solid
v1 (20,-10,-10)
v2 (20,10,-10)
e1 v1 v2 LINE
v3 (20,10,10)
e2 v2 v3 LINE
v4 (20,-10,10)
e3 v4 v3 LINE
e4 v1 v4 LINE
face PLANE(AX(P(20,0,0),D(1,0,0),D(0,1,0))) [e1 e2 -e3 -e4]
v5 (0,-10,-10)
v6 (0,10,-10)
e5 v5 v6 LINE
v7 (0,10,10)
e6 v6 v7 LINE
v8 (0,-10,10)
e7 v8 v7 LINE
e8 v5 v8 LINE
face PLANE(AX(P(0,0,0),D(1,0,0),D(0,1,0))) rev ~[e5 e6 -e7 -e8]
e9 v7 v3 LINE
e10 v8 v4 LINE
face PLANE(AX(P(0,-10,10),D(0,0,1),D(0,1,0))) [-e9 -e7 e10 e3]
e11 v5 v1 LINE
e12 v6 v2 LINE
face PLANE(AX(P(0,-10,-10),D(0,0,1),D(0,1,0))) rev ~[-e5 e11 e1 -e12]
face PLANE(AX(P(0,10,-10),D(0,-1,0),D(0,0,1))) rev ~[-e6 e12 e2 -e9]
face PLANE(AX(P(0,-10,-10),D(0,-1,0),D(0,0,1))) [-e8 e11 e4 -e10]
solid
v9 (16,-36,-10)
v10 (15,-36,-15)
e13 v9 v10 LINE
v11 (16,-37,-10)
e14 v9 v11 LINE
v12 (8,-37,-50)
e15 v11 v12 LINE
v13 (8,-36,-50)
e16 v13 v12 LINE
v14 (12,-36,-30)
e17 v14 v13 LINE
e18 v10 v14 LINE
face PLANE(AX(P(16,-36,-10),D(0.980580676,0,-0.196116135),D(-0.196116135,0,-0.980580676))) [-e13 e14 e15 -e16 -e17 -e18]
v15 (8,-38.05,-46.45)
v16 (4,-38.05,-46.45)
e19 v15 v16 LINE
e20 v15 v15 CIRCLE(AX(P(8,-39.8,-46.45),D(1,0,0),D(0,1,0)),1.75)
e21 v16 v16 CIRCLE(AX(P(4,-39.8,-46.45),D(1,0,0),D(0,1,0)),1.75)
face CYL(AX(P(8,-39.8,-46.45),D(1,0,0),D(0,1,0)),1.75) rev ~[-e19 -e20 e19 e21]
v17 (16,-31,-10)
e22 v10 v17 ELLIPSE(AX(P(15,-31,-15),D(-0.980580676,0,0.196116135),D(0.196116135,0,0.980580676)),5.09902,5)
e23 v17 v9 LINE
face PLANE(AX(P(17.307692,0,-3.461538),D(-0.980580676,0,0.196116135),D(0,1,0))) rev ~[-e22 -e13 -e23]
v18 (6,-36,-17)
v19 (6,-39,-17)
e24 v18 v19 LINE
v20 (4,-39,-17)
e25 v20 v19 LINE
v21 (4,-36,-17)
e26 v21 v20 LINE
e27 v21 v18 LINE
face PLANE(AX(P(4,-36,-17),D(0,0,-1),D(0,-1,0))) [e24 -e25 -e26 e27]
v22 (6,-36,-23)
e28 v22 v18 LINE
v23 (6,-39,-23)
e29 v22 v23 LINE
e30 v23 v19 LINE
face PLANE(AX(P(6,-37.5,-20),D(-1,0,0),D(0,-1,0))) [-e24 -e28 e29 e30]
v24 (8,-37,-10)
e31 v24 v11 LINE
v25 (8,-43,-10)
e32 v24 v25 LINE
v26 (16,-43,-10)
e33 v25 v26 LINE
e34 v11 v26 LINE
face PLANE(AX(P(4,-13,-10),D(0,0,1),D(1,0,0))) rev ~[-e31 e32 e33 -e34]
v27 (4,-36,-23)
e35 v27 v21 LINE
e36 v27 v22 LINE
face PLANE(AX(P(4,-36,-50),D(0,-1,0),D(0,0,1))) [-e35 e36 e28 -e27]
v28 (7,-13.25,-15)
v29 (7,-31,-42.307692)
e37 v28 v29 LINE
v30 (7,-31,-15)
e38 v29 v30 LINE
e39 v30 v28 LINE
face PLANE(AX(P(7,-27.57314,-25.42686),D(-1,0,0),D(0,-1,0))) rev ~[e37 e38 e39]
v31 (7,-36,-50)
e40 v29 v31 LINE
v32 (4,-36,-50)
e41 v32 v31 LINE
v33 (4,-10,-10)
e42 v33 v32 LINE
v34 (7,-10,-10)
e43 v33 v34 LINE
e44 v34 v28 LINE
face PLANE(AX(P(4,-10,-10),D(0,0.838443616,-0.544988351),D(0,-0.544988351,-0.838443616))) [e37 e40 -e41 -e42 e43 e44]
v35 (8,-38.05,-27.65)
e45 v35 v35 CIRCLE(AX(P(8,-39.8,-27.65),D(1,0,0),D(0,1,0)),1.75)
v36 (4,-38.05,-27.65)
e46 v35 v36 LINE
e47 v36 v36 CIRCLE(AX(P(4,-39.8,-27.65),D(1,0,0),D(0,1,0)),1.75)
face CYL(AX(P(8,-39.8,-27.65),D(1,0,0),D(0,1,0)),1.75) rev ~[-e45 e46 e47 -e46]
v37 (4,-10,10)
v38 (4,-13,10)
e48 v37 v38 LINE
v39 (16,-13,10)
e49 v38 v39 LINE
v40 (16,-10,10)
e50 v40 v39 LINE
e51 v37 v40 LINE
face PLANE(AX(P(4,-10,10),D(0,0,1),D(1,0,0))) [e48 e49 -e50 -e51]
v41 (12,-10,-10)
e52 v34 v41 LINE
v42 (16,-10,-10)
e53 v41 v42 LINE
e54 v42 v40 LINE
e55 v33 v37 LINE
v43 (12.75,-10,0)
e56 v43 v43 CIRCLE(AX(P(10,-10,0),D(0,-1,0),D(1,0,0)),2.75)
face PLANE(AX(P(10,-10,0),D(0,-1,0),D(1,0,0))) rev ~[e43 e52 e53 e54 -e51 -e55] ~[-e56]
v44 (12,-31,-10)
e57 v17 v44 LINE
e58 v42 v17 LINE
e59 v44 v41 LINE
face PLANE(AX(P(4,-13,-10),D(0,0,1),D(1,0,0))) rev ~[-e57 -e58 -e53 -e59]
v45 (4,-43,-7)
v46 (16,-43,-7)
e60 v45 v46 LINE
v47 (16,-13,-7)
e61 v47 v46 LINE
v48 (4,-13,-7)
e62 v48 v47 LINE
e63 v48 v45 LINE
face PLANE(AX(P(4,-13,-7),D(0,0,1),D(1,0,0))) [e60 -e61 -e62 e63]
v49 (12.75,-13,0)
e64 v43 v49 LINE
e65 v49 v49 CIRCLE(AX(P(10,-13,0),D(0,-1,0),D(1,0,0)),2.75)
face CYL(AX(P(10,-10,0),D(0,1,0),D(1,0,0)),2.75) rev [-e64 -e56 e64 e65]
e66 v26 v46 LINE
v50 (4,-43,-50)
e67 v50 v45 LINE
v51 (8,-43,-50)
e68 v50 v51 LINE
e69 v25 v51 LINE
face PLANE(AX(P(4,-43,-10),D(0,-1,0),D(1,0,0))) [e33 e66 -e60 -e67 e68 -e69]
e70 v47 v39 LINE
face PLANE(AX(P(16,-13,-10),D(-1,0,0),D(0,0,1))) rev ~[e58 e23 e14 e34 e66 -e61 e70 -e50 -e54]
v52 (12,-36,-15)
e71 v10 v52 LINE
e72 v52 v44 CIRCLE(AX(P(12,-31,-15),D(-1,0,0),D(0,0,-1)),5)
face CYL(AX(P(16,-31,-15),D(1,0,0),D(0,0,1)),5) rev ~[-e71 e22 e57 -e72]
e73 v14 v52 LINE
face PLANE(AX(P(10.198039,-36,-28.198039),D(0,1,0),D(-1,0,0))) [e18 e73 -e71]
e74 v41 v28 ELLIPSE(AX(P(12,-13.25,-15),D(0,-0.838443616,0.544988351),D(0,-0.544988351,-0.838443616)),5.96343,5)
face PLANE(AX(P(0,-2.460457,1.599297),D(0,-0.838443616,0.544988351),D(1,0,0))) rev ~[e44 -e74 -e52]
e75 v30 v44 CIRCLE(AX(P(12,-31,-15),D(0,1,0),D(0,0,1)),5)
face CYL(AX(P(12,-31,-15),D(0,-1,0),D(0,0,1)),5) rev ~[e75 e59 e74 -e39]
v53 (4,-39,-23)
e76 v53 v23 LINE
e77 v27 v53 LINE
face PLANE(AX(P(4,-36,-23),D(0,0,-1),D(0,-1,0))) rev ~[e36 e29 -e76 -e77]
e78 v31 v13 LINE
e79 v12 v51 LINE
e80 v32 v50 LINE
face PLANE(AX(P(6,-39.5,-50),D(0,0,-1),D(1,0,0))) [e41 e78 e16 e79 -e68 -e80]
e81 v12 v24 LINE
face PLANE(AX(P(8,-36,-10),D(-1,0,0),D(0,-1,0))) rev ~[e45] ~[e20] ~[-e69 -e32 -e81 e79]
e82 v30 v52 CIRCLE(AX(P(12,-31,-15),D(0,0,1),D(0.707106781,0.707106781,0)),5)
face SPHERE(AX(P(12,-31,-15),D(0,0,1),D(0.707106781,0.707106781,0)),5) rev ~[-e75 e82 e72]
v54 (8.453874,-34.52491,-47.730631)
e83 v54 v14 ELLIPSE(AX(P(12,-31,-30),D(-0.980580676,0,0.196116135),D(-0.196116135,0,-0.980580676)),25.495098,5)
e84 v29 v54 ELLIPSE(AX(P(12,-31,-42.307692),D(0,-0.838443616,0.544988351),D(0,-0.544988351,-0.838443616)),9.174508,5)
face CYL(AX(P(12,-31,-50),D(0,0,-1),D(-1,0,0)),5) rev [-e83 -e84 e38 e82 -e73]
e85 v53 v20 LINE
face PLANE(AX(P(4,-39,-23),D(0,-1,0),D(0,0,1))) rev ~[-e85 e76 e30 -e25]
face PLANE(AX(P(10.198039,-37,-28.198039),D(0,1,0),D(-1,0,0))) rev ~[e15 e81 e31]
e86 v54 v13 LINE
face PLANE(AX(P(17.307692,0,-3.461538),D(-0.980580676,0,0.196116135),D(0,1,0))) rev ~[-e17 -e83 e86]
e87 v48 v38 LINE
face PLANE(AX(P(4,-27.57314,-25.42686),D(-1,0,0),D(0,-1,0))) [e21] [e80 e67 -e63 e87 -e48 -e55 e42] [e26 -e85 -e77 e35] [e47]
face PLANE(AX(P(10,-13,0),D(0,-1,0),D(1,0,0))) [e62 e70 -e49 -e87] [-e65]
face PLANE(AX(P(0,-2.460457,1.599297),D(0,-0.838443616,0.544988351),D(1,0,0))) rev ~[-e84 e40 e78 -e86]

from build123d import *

# Parameters (mm, degrees)
F0_W          = 20
F0_H          = 20
F1_DEPTH      = 20
F2_W          = 12
F2_H          = 20
F2_R          = 2.75
F3_DEPTH      = 3
F4_W          = 12
F4_H          = 3
F5_DEPTH      = 30
F6_W          = 4
F6_H          = 7
F7_DEPTH      = 40
F8_R          = 1.75
F9_DEPTH      = 25
F11_DEPTH     = 1
F12_W         = 3
F12_H         = 6
F13_DEPTH     = 2
F15_DEPTH     = 3
F16_S3_W      = 5
F16_S3_H      = 5
F16_T4_DEPTH  = 5
F16_T10_DEPTH = 21
F16_T15_DEPTH = 4
F16_T20_DEPTH = 35


# Not quite as in the source:
# - a fillet or chamfer that OpenCascade refuses, or shapes differently, is made with other operations: its cross-section is extruded or revolved along the edge and cut away or added


with BuildPart() as f1:
    # F0 (on Right) → F1 (new body)
    with BuildSketch(Plane.YZ):
        Rectangle(F0_W, F0_H)
    extrude(amount=F1_DEPTH)


with BuildPart() as f3:
    # F2 (on face) → F3 (new body)
    with BuildSketch(Plane.XZ.offset(10)):
        with Locations((10, 0)):
            Rectangle(F2_W, F2_H)
        with Locations((10, 0)):
            Circle(F2_R, mode=Mode.SUBTRACT)
    extrude(amount=F3_DEPTH)

    # F4 (on face) → F5 (join)
    with BuildSketch(Plane.XZ.offset(13)):
        with Locations((10, -8.5)):
            Rectangle(F4_W, F4_H)
    extrude(amount=F5_DEPTH)

    # F6 (on face) → F7 (join)
    with BuildSketch(Plane(origin=(0, 0, -10), x_dir=(1, 0, 0), z_dir=(0, 0, -1))):
        with Locations((6, 39.5)):
            Rectangle(F6_W, F6_H)
    extrude(amount=F7_DEPTH)

    # F8 (on face) → F9 (cut)
    with BuildSketch(Plane.YZ.offset(8)):
        with Locations((-39.8, -46.45)):
            Circle(F8_R)
        with Locations((-39.8, -27.65)):
            Circle(F8_R)
    extrude(amount=-F9_DEPTH, mode=Mode.SUBTRACT)

    # F10 (on face) → F11 (join)
    with BuildSketch(Plane(origin=(0, -36, 0), x_dir=(-1, 0, 0), z_dir=(0, 1, 0))):
        Polygon((-16, -10), (-8, -50), (-8, -10), align=None)
    extrude(amount=-F11_DEPTH)

    # F12 (on face) → F13 (cut)
    with BuildSketch(Plane(origin=(4, 0, 0), x_dir=(0, -1, 0), z_dir=(-1, 0, 0))):
        with Locations((37.5, -20)):
            Rectangle(F12_W, F12_H)
    extrude(amount=-F13_DEPTH, mode=Mode.SUBTRACT)

    # F14 (on face) → F15 (join)
    with BuildSketch(Plane(origin=(4, 0, 0), x_dir=(0, -1, 0), z_dir=(-1, 0, 0))):
        Polygon((36, -17), (36, -10), (10, -10), (36, -50), (36, -23), align=None)
    extrude(amount=-F15_DEPTH)

    # F16: fillet of radius 5 on 3 edges, made by hand


with BuildPart() as f16_tool2:
    # F16_s3 → F16_t4 (new body)
    with BuildSketch(Plane.XY.offset(-15)):
        with Locations((9.5, -33.5)):
            Rectangle(F16_S3_W, F16_S3_H)
    extrude(amount=F16_T4_DEPTH)

    # F16_s5 → F16_t6 (revolve, cut)
    with BuildSketch(Plane(origin=(12, -31, -15), x_dir=(0.7071067812, 0.7071067812, 0), z_dir=(0.7071067812, -0.7071067812, 0))):
        with BuildLine():
            ThreePointArc((0, -5), (5, 0), (0, 5))
            Line((0, 5), (0, -5))
        make_face()
    revolve(axis=Axis((12, -31, -15), (0, 0, 1)), mode=Mode.SUBTRACT)


with BuildPart() as f3_1:
    add(f3.part)

    # F16_t1: union F16_tool2
    add(f16_tool2.part)


with BuildPart() as f16_tool8:
    # F16_s9 → F16_t10 (new body)
    with BuildSketch(Plane.XZ.offset(31)):
        with BuildLine():
            ThreePointArc((12, -10), (8.4644660941, -11.4644660941), (7, -15))
            Line((7, -15), (7, -10))
            Line((7, -10), (12, -10))
        make_face()
    extrude(amount=-F16_T10_DEPTH)

    split(bisect_by=Plane(origin=(0, -2.460456942, 1.5992970123), x_dir=(1, 0, 0), z_dir=(0, -0.8384436163, 0.5449883506)), keep=Keep.TOP)


with BuildPart() as f3_2:
    add(f3_1.part)

    # F16_t7: union F16_tool8
    add(f16_tool8.part)


with BuildPart() as f16_tool13:
    # F16_s14 → F16_t15 (new body)
    with BuildSketch(Plane.YZ.offset(16)):
        with BuildLine():
            ThreePointArc((-31, -10), (-34.5355339059, -11.4644660941), (-36, -15))
            Line((-36, -15), (-36, -10))
            Line((-36, -10), (-31, -10))
        make_face()
    extrude(amount=-F16_T15_DEPTH)

    split(bisect_by=Plane(origin=(17.3076923077, 0, -3.4615384615), x_dir=(0, 1, 0), z_dir=(-0.9805806757, 0, 0.1961161351)), keep=Keep.TOP)


with BuildPart() as f3_3:
    add(f3_2.part)

    # F16_t12: union F16_tool13
    add(f16_tool13.part)


with BuildPart() as f16_tool18:
    # F16_s19 → F16_t20 (new body)
    with BuildSketch(Plane.XY.offset(-50)):
        with BuildLine():
            ThreePointArc((7, -31), (8.4644660941, -34.5355339059), (12, -36))
            Line((12, -36), (7, -36))
            Line((7, -36), (7, -31))
        make_face()
    extrude(amount=F16_T20_DEPTH)

    split(bisect_by=Plane(origin=(0, -2.460456942, 1.5992970123), x_dir=(1, 0, 0), z_dir=(0, -0.8384436163, 0.5449883506)), keep=Keep.TOP)

    split(bisect_by=Plane(origin=(17.3076923077, 0, -3.4615384615), x_dir=(0, 1, 0), z_dir=(-0.9805806757, 0, 0.1961161351)), keep=Keep.TOP)


with BuildPart() as f3_4:
    add(f3_3.part)

    # F16_t17: union F16_tool18
    add(f16_tool18.part)


solid = Compound([f1.part, f3_4.part])
